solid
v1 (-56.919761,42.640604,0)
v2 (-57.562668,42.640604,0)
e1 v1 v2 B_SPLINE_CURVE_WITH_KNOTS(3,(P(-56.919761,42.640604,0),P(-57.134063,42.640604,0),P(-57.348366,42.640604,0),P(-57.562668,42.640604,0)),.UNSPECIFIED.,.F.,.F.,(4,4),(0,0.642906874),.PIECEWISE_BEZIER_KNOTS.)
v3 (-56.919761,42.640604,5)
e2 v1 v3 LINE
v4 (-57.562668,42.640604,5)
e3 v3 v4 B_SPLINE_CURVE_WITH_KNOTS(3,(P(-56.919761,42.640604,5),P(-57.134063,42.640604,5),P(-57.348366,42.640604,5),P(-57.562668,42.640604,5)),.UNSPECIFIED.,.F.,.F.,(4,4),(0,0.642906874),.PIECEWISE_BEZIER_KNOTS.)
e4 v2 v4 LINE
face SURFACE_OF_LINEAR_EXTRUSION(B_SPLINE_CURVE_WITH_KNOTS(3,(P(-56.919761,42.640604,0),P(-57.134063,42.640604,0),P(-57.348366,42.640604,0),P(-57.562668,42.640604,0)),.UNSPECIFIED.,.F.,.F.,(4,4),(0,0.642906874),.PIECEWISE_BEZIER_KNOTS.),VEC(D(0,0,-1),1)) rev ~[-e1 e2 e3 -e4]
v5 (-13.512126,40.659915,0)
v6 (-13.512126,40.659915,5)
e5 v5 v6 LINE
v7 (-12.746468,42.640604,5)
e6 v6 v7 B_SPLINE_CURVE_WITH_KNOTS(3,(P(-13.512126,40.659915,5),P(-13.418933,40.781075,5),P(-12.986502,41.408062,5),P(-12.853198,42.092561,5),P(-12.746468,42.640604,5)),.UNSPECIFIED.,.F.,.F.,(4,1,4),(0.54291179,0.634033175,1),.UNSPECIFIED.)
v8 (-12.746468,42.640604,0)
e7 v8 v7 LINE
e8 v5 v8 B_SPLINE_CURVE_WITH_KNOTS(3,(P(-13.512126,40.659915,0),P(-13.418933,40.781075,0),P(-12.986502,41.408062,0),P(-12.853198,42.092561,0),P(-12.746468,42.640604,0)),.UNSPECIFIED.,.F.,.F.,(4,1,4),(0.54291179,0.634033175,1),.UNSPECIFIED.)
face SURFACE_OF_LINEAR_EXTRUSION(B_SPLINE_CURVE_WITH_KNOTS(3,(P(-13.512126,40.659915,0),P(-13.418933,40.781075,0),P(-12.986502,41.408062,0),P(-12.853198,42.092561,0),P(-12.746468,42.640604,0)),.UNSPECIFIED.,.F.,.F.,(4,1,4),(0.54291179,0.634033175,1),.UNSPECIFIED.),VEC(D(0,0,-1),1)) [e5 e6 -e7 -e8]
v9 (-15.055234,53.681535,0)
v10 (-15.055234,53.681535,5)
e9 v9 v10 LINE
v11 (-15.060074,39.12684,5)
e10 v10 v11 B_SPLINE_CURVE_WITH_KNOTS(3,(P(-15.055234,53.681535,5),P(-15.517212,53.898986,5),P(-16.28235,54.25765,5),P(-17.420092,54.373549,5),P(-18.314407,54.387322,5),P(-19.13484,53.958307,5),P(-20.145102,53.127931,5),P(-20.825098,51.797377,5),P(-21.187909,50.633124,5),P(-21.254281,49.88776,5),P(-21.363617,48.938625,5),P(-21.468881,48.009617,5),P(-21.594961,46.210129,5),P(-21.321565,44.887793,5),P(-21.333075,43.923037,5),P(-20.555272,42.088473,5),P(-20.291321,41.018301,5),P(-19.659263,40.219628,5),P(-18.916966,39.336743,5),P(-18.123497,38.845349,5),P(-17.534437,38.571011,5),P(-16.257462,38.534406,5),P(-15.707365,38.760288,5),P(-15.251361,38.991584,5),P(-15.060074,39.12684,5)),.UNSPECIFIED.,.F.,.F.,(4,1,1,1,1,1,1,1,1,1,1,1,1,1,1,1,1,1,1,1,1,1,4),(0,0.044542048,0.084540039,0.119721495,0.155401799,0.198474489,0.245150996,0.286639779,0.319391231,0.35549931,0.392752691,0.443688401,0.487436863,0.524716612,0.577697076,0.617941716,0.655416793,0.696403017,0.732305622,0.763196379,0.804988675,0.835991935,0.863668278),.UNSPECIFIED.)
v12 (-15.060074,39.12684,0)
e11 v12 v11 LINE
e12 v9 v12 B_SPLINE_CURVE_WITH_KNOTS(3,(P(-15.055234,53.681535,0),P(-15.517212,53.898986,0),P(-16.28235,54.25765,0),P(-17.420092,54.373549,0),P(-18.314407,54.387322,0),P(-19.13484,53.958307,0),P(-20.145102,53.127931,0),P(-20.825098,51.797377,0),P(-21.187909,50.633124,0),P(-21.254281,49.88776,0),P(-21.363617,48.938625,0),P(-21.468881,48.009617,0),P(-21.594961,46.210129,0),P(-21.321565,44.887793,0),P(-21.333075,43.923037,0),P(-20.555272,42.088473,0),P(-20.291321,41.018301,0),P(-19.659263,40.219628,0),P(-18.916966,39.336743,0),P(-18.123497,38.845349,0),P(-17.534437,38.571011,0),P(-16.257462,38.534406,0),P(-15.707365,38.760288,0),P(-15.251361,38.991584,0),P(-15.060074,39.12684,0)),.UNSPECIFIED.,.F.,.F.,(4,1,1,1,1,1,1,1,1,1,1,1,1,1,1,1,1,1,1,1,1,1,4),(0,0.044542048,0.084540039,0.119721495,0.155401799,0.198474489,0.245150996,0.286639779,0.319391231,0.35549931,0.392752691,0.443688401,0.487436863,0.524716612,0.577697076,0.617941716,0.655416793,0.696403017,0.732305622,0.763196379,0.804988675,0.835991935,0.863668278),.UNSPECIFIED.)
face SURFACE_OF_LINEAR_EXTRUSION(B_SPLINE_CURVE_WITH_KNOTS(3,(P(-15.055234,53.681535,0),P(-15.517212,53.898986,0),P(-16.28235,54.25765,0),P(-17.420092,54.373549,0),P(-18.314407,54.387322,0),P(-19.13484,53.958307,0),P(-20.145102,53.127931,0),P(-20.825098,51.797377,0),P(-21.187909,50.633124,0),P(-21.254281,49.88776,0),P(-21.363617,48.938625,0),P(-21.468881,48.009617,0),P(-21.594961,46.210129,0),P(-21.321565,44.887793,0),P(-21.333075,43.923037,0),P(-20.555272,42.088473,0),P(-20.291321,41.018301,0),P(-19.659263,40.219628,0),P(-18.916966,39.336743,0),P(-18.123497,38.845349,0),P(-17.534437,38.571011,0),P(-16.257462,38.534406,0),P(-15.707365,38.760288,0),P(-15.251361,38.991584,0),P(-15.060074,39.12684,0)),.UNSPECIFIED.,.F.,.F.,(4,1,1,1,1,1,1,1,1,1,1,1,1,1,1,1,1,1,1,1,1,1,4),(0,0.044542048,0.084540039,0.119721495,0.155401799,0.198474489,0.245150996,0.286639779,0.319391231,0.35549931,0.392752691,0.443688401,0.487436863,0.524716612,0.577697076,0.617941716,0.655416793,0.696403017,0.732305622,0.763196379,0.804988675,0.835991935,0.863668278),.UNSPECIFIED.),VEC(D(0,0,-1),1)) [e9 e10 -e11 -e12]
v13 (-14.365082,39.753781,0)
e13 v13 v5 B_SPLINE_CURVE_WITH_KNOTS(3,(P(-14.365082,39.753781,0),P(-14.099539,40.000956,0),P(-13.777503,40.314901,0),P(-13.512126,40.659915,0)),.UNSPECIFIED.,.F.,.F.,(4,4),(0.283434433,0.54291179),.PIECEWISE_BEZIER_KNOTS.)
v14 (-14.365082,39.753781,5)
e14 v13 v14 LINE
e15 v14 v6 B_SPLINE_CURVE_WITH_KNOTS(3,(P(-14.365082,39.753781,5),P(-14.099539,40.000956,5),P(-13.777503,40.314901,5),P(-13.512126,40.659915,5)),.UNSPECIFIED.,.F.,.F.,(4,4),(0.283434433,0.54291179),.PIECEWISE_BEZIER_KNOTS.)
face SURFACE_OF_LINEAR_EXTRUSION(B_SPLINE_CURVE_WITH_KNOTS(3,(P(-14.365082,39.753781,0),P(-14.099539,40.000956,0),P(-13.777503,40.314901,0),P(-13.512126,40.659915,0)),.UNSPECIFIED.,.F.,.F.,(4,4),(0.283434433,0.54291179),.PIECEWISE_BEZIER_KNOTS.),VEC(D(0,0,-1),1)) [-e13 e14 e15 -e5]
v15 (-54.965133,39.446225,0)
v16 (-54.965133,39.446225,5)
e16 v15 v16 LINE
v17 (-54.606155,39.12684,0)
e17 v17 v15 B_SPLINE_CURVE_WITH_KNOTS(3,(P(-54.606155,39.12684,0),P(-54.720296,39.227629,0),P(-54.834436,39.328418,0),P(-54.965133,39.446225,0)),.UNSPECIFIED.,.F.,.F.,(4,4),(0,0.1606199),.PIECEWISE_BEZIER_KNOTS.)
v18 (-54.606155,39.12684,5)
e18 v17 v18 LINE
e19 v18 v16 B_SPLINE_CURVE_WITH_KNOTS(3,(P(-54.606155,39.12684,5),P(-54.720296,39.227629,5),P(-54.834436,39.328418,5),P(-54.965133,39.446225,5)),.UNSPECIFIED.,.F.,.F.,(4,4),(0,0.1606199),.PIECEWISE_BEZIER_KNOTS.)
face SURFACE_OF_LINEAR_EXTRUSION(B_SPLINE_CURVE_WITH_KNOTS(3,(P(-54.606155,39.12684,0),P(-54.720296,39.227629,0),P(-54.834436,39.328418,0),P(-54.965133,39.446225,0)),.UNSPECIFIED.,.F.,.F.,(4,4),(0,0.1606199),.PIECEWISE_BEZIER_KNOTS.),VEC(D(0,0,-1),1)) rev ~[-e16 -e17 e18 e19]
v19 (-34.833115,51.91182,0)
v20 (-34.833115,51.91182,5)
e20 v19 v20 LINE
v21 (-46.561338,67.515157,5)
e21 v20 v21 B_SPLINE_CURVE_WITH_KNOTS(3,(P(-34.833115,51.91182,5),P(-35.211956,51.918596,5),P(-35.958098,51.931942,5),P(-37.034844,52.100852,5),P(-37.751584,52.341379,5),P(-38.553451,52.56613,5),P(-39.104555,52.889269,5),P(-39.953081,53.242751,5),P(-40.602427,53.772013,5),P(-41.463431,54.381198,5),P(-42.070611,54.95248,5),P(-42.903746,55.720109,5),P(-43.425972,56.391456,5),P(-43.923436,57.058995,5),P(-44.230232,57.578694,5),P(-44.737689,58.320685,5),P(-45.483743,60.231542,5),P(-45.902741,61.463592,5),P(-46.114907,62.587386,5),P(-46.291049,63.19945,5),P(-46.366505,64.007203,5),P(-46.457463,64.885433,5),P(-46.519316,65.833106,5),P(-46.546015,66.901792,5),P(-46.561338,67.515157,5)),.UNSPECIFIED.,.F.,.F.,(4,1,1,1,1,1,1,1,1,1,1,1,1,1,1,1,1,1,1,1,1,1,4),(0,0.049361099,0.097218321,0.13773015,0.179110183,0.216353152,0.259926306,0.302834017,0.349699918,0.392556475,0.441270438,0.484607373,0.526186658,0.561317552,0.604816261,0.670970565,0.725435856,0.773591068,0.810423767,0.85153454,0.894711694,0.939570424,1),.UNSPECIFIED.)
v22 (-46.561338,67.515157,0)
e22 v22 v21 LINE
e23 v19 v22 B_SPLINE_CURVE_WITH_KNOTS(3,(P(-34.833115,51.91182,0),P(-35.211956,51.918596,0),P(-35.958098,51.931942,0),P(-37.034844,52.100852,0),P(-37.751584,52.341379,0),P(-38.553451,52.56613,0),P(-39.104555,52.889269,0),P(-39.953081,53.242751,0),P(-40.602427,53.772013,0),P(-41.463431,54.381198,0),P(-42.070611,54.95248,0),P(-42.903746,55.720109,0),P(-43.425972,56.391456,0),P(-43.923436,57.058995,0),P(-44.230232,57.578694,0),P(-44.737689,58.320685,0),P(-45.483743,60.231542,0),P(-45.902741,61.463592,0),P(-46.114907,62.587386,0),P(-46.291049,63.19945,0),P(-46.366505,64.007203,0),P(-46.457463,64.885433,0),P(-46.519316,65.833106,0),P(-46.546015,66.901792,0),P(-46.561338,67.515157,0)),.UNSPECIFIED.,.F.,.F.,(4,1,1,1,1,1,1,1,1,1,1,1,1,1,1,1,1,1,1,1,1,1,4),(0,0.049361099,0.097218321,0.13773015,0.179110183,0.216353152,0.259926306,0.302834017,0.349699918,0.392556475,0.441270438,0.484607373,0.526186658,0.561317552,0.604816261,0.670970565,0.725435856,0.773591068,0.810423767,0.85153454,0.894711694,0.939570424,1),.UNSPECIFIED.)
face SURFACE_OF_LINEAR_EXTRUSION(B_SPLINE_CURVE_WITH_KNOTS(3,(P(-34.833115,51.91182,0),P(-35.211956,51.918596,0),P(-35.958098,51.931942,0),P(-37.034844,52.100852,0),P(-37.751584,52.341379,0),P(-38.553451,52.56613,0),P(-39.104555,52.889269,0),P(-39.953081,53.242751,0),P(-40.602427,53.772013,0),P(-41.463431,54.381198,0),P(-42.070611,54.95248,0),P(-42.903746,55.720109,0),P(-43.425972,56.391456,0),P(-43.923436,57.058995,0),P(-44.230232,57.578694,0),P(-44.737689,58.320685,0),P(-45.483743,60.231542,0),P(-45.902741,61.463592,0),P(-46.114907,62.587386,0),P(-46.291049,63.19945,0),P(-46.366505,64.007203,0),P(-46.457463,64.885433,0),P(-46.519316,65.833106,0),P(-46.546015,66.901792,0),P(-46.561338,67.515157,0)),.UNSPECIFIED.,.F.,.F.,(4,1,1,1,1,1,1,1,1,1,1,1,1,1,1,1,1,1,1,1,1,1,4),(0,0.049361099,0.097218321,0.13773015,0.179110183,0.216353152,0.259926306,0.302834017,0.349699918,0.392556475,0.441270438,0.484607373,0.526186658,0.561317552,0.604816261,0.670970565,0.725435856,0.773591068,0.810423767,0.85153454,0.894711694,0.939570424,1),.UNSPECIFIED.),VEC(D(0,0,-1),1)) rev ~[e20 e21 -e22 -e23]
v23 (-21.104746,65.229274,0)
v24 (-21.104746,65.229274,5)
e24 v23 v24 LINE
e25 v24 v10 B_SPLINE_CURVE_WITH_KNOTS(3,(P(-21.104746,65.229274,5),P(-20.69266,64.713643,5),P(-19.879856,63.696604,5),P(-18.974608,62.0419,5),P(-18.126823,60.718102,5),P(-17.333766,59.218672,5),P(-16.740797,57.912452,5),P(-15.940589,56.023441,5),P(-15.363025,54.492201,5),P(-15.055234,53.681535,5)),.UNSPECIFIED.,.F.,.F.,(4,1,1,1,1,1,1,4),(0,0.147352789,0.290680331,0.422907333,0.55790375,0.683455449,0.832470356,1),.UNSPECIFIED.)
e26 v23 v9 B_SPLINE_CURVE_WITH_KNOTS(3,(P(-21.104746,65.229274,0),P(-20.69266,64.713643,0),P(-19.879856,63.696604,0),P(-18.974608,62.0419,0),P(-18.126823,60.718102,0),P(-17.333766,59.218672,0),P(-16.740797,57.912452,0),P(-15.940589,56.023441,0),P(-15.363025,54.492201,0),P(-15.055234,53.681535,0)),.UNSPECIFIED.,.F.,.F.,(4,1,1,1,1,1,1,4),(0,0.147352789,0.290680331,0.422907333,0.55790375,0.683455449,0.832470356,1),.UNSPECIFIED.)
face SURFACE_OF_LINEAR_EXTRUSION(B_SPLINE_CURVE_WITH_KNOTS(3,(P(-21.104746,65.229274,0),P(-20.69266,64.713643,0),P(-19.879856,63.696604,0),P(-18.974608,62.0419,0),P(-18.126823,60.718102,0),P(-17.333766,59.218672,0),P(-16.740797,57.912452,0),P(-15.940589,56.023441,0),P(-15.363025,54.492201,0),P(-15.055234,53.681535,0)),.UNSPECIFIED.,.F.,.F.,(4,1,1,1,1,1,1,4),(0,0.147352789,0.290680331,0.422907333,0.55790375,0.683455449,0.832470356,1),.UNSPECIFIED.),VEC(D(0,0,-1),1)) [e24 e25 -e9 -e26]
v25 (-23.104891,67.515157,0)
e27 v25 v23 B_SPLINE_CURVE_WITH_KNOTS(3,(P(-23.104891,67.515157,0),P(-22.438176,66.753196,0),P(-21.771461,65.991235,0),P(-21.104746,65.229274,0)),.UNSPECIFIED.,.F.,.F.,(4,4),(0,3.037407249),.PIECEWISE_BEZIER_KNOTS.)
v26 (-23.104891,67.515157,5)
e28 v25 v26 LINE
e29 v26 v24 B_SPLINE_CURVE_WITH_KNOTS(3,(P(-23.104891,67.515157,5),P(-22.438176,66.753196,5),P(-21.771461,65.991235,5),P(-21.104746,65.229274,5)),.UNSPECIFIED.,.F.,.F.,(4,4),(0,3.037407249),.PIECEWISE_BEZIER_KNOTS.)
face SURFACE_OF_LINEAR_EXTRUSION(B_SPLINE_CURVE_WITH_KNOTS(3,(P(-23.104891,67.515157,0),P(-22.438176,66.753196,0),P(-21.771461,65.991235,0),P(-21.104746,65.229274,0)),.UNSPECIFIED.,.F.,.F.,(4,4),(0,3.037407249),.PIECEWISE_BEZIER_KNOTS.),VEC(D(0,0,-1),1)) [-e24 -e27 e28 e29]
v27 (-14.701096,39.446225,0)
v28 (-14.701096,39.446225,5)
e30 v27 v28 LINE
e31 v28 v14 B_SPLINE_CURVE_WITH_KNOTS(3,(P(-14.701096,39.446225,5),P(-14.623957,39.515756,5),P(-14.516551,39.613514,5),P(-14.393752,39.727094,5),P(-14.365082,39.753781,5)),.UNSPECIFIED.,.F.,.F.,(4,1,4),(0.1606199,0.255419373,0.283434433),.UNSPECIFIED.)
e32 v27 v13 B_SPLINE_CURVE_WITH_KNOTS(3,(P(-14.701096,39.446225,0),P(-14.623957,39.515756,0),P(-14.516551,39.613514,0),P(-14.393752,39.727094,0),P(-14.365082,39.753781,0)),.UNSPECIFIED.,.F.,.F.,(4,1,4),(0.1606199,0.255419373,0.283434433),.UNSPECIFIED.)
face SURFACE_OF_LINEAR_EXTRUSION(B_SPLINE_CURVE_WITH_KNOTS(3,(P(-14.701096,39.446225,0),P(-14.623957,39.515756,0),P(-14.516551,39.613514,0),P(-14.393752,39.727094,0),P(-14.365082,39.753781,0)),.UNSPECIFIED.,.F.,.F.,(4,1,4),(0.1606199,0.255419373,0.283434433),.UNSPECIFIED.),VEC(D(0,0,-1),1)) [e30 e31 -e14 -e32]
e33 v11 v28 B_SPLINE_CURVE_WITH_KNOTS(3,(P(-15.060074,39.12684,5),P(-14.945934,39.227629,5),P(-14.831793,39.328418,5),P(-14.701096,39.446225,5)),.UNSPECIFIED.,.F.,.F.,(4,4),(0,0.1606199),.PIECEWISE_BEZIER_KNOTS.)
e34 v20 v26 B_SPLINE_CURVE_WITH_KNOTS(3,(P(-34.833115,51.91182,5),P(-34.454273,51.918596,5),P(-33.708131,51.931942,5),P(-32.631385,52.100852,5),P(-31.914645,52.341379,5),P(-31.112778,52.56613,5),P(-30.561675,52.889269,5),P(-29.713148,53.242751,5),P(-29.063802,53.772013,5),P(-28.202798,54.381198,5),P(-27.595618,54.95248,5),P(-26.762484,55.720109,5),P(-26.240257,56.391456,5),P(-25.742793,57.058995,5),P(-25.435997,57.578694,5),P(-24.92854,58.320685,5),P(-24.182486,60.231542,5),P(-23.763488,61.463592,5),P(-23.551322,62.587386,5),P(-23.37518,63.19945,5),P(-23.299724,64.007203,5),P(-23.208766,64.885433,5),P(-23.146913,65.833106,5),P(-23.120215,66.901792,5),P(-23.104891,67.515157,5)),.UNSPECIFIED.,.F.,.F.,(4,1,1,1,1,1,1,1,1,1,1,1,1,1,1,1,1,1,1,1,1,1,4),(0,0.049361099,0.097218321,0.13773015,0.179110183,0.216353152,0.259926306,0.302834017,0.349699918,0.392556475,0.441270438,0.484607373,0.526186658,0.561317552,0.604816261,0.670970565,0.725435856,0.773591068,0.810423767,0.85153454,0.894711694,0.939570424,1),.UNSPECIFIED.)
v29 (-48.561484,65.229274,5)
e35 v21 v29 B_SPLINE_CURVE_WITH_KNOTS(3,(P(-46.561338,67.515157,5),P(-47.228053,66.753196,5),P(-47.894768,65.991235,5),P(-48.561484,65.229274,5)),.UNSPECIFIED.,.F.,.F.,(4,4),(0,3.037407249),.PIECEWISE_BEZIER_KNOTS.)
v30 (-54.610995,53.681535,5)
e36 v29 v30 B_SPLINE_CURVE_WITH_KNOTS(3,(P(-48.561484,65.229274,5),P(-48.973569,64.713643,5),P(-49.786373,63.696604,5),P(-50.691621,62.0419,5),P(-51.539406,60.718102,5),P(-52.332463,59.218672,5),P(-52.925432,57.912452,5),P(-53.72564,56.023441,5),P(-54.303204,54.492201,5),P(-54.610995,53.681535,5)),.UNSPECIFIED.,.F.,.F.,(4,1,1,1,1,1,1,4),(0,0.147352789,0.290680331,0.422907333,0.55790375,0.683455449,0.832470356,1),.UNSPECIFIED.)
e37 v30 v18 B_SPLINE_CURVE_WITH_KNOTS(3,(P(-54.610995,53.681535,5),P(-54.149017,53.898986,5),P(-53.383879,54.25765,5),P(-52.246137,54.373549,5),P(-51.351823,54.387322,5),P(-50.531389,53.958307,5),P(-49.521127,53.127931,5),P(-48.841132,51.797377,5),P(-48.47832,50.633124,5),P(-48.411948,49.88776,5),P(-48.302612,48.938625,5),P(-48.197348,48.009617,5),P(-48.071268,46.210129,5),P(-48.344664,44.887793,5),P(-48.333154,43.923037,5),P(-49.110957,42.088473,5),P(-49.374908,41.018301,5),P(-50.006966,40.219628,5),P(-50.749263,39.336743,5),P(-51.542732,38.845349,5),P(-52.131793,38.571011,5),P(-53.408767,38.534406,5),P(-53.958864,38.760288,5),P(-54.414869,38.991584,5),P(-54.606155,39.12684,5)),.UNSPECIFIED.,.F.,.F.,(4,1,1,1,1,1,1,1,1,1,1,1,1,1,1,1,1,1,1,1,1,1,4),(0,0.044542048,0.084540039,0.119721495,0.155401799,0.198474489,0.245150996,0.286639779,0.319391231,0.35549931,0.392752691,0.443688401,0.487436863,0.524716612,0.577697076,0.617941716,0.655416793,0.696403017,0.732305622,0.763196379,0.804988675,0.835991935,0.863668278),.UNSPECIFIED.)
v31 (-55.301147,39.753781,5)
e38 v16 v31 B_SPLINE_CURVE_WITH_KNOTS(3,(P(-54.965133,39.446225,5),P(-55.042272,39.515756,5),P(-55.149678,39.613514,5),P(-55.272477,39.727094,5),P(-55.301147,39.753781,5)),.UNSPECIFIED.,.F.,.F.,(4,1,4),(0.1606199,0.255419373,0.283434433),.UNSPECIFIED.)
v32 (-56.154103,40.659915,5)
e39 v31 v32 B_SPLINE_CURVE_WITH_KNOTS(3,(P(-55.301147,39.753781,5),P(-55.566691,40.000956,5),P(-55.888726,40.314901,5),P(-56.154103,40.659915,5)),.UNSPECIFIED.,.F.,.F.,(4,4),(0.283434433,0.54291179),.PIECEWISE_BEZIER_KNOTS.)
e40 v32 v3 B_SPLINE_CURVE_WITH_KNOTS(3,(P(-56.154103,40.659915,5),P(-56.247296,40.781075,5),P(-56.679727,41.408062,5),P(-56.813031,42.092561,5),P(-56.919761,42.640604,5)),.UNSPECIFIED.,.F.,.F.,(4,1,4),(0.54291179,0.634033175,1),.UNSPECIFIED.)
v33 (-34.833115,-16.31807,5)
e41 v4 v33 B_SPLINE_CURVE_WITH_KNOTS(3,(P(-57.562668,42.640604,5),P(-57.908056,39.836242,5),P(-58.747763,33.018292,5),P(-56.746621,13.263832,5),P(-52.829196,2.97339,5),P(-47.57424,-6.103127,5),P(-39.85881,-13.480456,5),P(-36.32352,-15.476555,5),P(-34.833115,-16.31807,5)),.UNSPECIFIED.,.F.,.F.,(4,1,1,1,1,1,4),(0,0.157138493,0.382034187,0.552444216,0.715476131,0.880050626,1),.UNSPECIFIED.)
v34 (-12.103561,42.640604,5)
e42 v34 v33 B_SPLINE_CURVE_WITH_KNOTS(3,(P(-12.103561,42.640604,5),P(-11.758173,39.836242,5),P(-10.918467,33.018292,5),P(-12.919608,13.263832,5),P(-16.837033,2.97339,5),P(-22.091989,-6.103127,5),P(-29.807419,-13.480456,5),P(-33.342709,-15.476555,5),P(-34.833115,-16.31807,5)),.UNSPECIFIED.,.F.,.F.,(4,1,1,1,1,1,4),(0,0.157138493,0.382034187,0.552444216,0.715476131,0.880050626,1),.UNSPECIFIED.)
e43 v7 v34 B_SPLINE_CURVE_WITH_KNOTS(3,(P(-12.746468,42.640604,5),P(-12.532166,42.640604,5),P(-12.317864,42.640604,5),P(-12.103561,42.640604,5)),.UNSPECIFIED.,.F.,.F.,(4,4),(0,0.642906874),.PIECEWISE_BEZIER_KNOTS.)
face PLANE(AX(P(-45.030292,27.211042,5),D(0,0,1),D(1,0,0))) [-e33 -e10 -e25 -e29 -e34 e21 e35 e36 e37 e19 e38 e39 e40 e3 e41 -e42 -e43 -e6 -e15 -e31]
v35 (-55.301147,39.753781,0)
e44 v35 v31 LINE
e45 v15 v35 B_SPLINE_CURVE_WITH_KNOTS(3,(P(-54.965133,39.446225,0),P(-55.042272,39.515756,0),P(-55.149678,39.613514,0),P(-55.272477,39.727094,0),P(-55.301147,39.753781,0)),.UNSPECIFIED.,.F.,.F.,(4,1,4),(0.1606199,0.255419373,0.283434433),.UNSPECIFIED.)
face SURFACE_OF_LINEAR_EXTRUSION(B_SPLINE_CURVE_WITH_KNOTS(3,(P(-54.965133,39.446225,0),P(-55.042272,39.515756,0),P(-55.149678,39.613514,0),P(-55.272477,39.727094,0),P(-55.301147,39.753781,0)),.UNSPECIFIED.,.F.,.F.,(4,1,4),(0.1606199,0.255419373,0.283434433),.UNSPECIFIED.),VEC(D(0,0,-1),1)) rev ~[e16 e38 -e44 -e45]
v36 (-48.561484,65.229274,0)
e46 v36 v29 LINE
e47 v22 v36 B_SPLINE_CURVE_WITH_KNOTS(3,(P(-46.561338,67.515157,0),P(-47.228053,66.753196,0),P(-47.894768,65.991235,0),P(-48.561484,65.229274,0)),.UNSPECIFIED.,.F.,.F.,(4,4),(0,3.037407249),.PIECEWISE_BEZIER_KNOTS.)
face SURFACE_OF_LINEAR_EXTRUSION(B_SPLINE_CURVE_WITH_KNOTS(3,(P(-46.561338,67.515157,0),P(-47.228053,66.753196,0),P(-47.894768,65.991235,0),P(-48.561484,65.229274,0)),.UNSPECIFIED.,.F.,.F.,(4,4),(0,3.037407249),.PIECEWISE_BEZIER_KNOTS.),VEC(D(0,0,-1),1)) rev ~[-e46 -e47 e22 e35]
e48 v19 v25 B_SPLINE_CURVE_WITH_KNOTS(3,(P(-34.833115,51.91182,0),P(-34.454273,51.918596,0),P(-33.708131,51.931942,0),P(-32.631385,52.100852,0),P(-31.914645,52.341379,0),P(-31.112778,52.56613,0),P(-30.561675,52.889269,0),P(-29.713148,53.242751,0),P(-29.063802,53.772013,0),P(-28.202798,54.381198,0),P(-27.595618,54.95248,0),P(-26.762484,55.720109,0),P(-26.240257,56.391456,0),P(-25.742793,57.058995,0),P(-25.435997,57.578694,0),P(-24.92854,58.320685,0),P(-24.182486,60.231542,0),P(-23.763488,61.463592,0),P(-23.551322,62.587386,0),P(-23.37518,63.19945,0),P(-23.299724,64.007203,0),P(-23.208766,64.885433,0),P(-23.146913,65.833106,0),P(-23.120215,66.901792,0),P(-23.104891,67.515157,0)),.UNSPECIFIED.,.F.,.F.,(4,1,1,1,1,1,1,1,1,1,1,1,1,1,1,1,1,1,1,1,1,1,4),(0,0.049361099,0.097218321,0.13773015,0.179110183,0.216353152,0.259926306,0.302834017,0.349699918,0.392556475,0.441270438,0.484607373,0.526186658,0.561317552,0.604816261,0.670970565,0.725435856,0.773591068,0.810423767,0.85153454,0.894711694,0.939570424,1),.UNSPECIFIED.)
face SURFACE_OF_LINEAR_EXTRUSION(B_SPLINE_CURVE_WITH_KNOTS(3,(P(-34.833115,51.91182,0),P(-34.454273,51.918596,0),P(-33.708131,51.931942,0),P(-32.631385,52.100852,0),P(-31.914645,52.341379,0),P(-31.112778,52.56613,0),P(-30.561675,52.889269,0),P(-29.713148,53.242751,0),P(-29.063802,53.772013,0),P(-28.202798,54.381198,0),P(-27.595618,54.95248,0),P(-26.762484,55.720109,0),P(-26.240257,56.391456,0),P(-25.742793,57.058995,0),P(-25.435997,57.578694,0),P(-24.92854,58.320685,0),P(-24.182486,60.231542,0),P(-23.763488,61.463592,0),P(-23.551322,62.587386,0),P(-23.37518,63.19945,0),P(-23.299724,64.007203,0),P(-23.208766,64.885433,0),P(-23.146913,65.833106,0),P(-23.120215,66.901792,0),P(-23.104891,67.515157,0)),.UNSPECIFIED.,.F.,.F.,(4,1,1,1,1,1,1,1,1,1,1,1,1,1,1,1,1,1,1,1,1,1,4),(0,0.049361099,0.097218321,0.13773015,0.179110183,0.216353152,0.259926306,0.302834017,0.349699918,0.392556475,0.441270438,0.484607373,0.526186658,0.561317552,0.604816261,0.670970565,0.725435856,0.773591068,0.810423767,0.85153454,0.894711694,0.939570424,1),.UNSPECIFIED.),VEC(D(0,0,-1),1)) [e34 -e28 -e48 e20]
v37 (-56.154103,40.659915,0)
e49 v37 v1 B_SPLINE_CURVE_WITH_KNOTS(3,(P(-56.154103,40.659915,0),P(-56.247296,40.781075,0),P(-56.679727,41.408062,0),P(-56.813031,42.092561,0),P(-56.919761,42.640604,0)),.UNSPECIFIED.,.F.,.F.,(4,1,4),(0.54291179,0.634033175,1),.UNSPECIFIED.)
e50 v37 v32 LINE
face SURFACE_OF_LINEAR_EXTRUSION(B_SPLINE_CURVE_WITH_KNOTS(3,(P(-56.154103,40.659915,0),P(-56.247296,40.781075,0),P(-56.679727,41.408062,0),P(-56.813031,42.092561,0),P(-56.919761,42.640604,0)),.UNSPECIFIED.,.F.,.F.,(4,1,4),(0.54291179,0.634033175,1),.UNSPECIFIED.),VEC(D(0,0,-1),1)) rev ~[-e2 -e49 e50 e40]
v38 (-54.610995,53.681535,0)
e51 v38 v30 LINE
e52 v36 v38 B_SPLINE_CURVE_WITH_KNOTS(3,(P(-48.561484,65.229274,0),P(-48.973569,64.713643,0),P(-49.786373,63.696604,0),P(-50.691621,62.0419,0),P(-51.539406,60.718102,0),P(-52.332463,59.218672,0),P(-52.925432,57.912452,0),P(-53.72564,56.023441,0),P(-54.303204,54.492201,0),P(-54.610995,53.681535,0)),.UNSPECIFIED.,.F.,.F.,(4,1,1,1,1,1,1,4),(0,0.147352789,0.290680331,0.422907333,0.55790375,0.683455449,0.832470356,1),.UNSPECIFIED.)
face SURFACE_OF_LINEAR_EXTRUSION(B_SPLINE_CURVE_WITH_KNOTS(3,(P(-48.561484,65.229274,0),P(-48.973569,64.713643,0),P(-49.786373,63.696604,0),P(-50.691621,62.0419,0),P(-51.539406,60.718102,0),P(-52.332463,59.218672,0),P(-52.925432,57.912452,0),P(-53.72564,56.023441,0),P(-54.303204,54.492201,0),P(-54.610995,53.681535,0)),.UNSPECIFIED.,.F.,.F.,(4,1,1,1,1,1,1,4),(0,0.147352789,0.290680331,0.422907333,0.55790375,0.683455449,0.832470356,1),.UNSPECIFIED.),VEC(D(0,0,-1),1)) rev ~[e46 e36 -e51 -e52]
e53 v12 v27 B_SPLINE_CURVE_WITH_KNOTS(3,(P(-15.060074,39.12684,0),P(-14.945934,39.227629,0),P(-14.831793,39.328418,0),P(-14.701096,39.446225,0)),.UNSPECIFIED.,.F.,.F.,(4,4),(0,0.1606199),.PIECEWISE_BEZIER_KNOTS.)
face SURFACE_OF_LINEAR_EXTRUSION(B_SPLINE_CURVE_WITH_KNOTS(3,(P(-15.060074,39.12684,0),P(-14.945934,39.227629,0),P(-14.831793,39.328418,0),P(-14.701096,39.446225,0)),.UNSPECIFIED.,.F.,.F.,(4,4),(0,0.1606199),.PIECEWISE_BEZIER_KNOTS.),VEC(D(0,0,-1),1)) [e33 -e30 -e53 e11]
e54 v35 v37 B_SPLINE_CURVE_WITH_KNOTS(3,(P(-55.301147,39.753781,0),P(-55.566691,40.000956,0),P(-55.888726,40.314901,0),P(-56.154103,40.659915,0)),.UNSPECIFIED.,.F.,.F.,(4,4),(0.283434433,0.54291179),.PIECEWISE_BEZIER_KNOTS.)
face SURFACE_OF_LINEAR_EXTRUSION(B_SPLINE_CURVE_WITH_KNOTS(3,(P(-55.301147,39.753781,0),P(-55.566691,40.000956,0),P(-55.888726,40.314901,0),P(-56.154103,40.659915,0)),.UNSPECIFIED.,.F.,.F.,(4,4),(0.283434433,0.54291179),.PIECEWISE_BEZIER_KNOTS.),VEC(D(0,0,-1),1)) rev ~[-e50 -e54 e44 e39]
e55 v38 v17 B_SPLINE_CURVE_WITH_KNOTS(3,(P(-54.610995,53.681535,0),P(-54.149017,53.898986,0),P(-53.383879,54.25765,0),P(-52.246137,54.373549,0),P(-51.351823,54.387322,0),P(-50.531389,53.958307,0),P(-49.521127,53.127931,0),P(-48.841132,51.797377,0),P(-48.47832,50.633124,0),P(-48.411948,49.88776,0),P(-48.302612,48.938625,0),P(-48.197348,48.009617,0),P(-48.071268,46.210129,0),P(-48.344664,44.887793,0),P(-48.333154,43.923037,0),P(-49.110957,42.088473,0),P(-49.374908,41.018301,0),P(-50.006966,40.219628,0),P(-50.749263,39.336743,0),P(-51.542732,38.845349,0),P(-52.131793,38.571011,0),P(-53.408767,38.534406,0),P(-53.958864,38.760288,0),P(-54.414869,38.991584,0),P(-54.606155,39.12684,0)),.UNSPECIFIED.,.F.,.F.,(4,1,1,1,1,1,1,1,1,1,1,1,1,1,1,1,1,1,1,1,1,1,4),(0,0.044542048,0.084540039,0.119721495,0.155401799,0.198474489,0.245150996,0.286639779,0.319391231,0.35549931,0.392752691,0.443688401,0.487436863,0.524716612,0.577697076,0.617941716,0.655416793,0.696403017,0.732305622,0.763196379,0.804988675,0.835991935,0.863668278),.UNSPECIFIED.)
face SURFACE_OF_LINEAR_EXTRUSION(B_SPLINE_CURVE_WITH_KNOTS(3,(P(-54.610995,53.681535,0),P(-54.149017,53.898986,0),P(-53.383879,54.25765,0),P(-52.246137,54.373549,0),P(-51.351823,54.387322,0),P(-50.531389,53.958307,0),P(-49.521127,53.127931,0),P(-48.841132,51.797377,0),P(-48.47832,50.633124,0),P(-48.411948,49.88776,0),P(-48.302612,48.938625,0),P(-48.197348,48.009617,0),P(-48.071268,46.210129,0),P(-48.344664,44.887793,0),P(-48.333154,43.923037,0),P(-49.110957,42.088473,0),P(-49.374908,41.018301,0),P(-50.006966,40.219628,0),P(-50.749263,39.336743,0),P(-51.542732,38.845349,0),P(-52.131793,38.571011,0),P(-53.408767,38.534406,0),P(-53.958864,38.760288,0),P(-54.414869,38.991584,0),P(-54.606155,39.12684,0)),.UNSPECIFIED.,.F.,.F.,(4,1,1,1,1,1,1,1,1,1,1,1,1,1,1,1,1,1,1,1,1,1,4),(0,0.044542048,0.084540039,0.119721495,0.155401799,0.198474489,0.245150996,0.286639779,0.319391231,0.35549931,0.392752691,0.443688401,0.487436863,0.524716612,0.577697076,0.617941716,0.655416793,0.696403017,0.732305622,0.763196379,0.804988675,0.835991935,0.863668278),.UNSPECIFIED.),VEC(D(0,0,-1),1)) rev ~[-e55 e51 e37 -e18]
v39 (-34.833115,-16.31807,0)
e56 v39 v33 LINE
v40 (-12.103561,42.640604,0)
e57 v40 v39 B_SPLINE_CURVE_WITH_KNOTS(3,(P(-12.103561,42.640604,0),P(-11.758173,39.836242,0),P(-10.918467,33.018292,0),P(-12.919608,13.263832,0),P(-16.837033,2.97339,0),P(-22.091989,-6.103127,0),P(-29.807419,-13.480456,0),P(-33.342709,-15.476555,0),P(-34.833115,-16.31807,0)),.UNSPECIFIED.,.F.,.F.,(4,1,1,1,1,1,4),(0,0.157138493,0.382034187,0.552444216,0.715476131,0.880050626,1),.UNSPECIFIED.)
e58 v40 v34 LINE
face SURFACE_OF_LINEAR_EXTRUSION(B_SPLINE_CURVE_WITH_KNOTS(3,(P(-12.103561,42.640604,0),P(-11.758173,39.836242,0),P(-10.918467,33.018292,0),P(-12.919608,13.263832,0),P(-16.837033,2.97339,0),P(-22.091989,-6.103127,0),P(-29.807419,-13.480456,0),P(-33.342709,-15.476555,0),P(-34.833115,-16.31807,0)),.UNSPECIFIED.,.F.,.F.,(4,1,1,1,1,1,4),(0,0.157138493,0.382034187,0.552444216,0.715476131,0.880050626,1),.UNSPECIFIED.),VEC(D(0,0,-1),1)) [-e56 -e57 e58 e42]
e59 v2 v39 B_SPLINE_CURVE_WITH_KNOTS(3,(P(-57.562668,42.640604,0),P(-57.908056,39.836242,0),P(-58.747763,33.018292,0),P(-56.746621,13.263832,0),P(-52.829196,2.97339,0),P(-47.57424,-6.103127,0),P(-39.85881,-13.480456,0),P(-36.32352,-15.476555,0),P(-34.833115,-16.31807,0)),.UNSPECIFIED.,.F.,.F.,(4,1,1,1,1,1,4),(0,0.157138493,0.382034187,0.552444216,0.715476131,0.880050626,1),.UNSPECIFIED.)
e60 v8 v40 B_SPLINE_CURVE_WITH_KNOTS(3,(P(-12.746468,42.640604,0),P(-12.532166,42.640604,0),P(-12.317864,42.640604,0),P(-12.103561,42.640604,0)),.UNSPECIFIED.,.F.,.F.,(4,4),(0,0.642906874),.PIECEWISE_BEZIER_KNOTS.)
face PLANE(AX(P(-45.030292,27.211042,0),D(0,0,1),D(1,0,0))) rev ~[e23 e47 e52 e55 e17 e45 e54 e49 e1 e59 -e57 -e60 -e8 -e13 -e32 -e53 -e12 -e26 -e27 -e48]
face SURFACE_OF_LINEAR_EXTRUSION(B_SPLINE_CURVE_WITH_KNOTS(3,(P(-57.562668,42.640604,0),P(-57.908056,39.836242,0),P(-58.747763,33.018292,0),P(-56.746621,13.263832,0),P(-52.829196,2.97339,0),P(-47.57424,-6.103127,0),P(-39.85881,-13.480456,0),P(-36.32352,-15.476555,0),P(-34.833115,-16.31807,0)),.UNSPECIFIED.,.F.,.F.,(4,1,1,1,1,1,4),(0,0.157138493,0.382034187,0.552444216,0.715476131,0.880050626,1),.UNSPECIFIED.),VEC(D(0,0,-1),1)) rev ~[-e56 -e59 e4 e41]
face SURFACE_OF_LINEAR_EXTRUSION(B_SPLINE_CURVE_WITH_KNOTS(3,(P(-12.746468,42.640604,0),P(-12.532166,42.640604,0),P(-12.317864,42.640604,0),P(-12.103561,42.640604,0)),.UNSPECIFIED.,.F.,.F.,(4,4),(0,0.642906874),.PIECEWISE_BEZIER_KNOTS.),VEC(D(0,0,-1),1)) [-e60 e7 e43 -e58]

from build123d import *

# Parameters (mm, degrees)
F1_DEPTH = 5


with BuildPart() as f1:
    # F0 (on Top) → F1 (new body)
    with BuildSketch(Plane.XY):
        with BuildLine():
            add(Edge.make_bspline(
                [(-57.5626678765, 42.6406040788), (-57.9080562921, 39.8362415044), (-58.7477625906, 33.018291596), (-56.7466207027, 13.2638324141), (-52.8291963564, 2.9733901681), (-47.5742402511, -6.1031265313), (-39.8588097864, -13.4804555699), (-36.3235197152, -15.4765553984), (-34.8331145942, -16.3180697709)],
                knots=[0, 0, 0, 0, 0.1571384934, 0.3820341872, 0.5524442159, 0.7154761313, 0.880050626, 1, 1, 1, 1], degree=3))
            Line((-34.8331145942, -16.3180697709), (-34.8331145942, 51.9118197262))
            add(Edge.make_bspline(
                [(-34.8331145942, 51.9118197262), (-35.2119563545, 51.9185959347), (-35.9580977588, 51.9319419017), (-37.0348440475, 52.1008517041), (-37.751583743, 52.3413787982), (-38.5534512152, 52.5661302145), (-39.1045545857, 52.8892692232), (-39.9530807974, 53.242750596), (-40.6024267483, 53.772012849), (-41.4634310205, 54.3811984195), (-42.0706109603, 54.9524802776), (-42.9037456065, 55.720108633), (-43.4259718244, 56.3914555617), (-43.9234358745, 57.0589950526), (-44.2302322209, 57.5786939094), (-44.7376887484, 58.3206849113), (-45.4837434911, 60.2315423487), (-45.9027412703, 61.4635918917), (-46.1149072684, 62.587386495), (-46.2910492058, 63.1994502703), (-46.3665046988, 64.0072029965), (-46.457462946, 64.8854328545), (-46.519316114, 65.8331058884), (-46.5460145844, 66.9017915796), (-46.5613380075, 67.5151571631)],
                knots=[0, 0, 0, 0, 0.0493610993, 0.0972183213, 0.1377301504, 0.1791101827, 0.2163531524, 0.2599263059, 0.3028340171, 0.3496999184, 0.3925564746, 0.4412704382, 0.4846073731, 0.5261866583, 0.5613175523, 0.6048162611, 0.6709705647, 0.7254358561, 0.7735910677, 0.8104237672, 0.8515345399, 0.8947116941, 0.939570424, 1, 1, 1, 1], degree=3))
            add(Edge.make_bspline(
                [(-46.5613380075, 67.5151571631), (-47.2280532122, 66.7531962196), (-47.8947684169, 65.9912352761), (-48.5614836216, 65.2292743325)],
                knots=[0, 0, 0, 0, 3.0374072485, 3.0374072485, 3.0374072485, 3.0374072485], degree=3))
            add(Edge.make_bspline(
                [(-48.5614836216, 65.2292743325), (-48.9735694738, 64.7136433972), (-49.7863729956, 63.6966043776), (-50.6916211477, 62.0419000493), (-51.5394060192, 60.7181023455), (-52.3324629663, 59.2186716244), (-52.9254322483, 57.9124520433), (-53.7256402788, 56.0234412783), (-54.3032039704, 54.4922006053), (-54.6109952031, 53.6815354107)],
                knots=[0, 0, 0, 0, 0.1473527895, 0.2906803309, 0.4229073329, 0.5579037502, 0.6834554494, 0.8324703555, 1, 1, 1, 1], degree=3))
            add(Edge.make_bspline(
                [(-54.6109952031, 53.6815354107), (-54.1490167087, 53.8989858417), (-53.3838791321, 54.2576504993), (-52.2461372119, 54.37354881), (-51.3518225299, 54.3873217778), (-50.5313887829, 53.9583071647), (-49.5211267731, 53.1279307693), (-48.8411316868, 51.797376606), (-48.4783197566, 50.6331243975), (-48.4119479233, 49.8877598597), (-48.3026124514, 48.9386253318), (-48.1973480176, 48.009616531), (-48.071268063, 46.2101292746), (-48.3446637999, 44.8877932345), (-48.333153973, 43.9230372084), (-49.1109571235, 42.0884729348), (-49.3749084991, 41.0183008159), (-50.0069662335, 40.2196283926), (-50.7492629002, 39.336743191), (-51.5427317075, 38.8453486879), (-52.1317926314, 38.5710112066), (-53.4087673752, 38.5344057135), (-53.9588643746, 38.7602882902), (-54.4148685339, 38.9915837878), (-54.6061547794, 39.1268395676)],
                knots=[0, 0, 0, 0, 0.0445420475, 0.0845400391, 0.1197214949, 0.1554017993, 0.1984744889, 0.2451509962, 0.2866397794, 0.3193912307, 0.3554993097, 0.3927526907, 0.4436884008, 0.4874368635, 0.5247166115, 0.5776970761, 0.6179417164, 0.6554167928, 0.6964030165, 0.732305622, 0.7631963792, 0.8049886746, 0.8359919351, 0.8636682784, 0.8636682784, 0.8636682784, 0.8636682784], degree=3))
            add(Edge.make_bspline(
                [(-54.6061547794, 39.1268395676), (-54.6592591816, 39.1643889341), (-54.7889448477, 39.2644677015), (-54.8995408977, 39.3780040162), (-54.9651332554, 39.4462250728)],
                knots=[0.8636682784, 0.8636682784, 0.8636682784, 0.8636682784, 0.8713517146, 0.8831028995, 0.8831028995, 0.8831028995, 0.8831028995], degree=3))
            add(Edge.make_bspline(
                [(-54.9651332554, 39.4462250728), (-55.0422718783, 39.5157558174), (-55.1496780772, 39.6135140467), (-55.2724769461, 39.7270938328), (-55.3011469605, 39.7537806896)],
                knots=[0.1606199003, 0.1606199003, 0.1606199003, 0.1606199003, 0.2554193728, 0.2834344333, 0.2834344333, 0.2834344333, 0.2834344333], degree=3))
            add(Edge.make_bspline(
                [(-55.3011469605, 39.7537806896), (-55.3239737809, 39.7694364315), (-55.5998529876, 39.9433833713), (-56.0474560794, 39.9919072855), (-56.1453497064, 40.5782185414), (-56.1541033084, 40.6599148874)],
                knots=[0.9022974714, 0.9022974714, 0.9022974714, 0.9022974714, 0.905798506, 0.9433289244, 0.9488544637, 0.9488544637, 0.9488544637, 0.9488544637], degree=3))
            add(Edge.make_bspline(
                [(-56.1541033084, 40.6599148874), (-56.2472964392, 40.7810745041), (-56.6797268519, 41.4080624482), (-56.8130311576, 42.0925613255), (-56.9197610021, 42.6406040788)],
                knots=[0.5429117903, 0.5429117903, 0.5429117903, 0.5429117903, 0.6340331748, 1, 1, 1, 1], degree=3))
            add(Edge.make_bspline(
                [(-56.9197610021, 42.6406040788), (-57.1340632935, 42.6406040788), (-57.348365585, 42.6406040788), (-57.5626678765, 42.6406040788)],
                knots=[0, 0, 0, 0, 0.6429068744, 0.6429068744, 0.6429068744, 0.6429068744], degree=3))
        make_face()
        with BuildLine():
            Line((-34.8331145942, 51.9118197262), (-34.8331145942, -16.3180697709))
            add(Edge.make_bspline(
                [(-12.103561312, 42.6406040788), (-11.7581728963, 39.8362415044), (-10.9184665978, 33.018291596), (-12.9196084857, 13.2638324141), (-16.8370328321, 2.9733901681), (-22.0919889373, -6.1031265313), (-29.8074194021, -13.4804555699), (-33.3427094733, -15.4765553984), (-34.8331145942, -16.3180697709)],
                knots=[0, 0, 0, 0, 0.1571384934, 0.3820341872, 0.5524442159, 0.7154761313, 0.880050626, 1, 1, 1, 1], degree=3))
            add(Edge.make_bspline(
                [(-12.7464681864, 42.6406040788), (-12.5321658949, 42.6406040788), (-12.3178636034, 42.6406040788), (-12.103561312, 42.6406040788)],
                knots=[0, 0, 0, 0, 0.6429068744, 0.6429068744, 0.6429068744, 0.6429068744], degree=3))
            add(Edge.make_bspline(
                [(-13.51212588, 40.6599148874), (-13.4189327492, 40.7810745041), (-12.9865023366, 41.4080624482), (-12.8531980309, 42.0925613255), (-12.7464681864, 42.6406040788)],
                knots=[0.5429117903, 0.5429117903, 0.5429117903, 0.5429117903, 0.6340331748, 1, 1, 1, 1], degree=3))
            add(Edge.make_bspline(
                [(-14.3650822279, 39.7537806896), (-14.3422554076, 39.7694364315), (-14.0663762008, 39.9433833713), (-13.618773109, 39.9919072855), (-13.5208794821, 40.5782185414), (-13.51212588, 40.6599148874)],
                knots=[0.9022974714, 0.9022974714, 0.9022974714, 0.9022974714, 0.905798506, 0.9433289244, 0.9488544637, 0.9488544637, 0.9488544637, 0.9488544637], degree=3))
            add(Edge.make_bspline(
                [(-14.7010959331, 39.4462250728), (-14.6239573101, 39.5157558174), (-14.5165511113, 39.6135140467), (-14.3937522423, 39.7270938328), (-14.3650822279, 39.7537806896)],
                knots=[0.1606199003, 0.1606199003, 0.1606199003, 0.1606199003, 0.2554193728, 0.2834344333, 0.2834344333, 0.2834344333, 0.2834344333], degree=3))
            add(Edge.make_bspline(
                [(-15.0600744091, 39.1268395676), (-15.0069700068, 39.1643889341), (-14.8772843408, 39.2644677015), (-14.7666882907, 39.3780040162), (-14.7010959331, 39.4462250728)],
                knots=[0.8636682784, 0.8636682784, 0.8636682784, 0.8636682784, 0.8713517146, 0.8831028995, 0.8831028995, 0.8831028995, 0.8831028995], degree=3))
            add(Edge.make_bspline(
                [(-15.0552339853, 53.6815354107), (-15.5172124798, 53.8989858417), (-16.2823500564, 54.2576504993), (-17.4200919766, 54.37354881), (-18.3144066585, 54.3873217778), (-19.1348404055, 53.9583071647), (-20.1451024154, 53.1279307693), (-20.8250975017, 51.797376606), (-21.1879094318, 50.6331243975), (-21.2542812651, 49.8877598597), (-21.363616737, 48.9386253318), (-21.4688811708, 48.009616531), (-21.5949611255, 46.2101292746), (-21.3215653885, 44.8877932345), (-21.3330752154, 43.9230372084), (-20.555272065, 42.0884729348), (-20.2913206893, 41.0183008159), (-19.6592629549, 40.2196283926), (-18.9169662882, 39.336743191), (-18.123497481, 38.8453486879), (-17.5344365571, 38.5710112066), (-16.2574618133, 38.5344057135), (-15.7073648139, 38.7602882902), (-15.2513606546, 38.9915837878), (-15.0600744091, 39.1268395676)],
                knots=[0, 0, 0, 0, 0.0445420475, 0.0845400391, 0.1197214949, 0.1554017993, 0.1984744889, 0.2451509962, 0.2866397794, 0.3193912307, 0.3554993097, 0.3927526907, 0.4436884008, 0.4874368635, 0.5247166115, 0.5776970761, 0.6179417164, 0.6554167928, 0.6964030165, 0.732305622, 0.7631963792, 0.8049886746, 0.8359919351, 0.8636682784, 0.8636682784, 0.8636682784, 0.8636682784], degree=3))
            add(Edge.make_bspline(
                [(-21.1047455668, 65.2292743325), (-20.6926597146, 64.7136433972), (-19.8798561928, 63.6966043776), (-18.9746080407, 62.0419000493), (-18.1268231693, 60.7181023455), (-17.3337662222, 59.2186716244), (-16.7407969402, 57.9124520433), (-15.9405889096, 56.0234412783), (-15.363025218, 54.4922006053), (-15.0552339853, 53.6815354107)],
                knots=[0, 0, 0, 0, 0.1473527895, 0.2906803309, 0.4229073329, 0.5579037502, 0.6834554494, 0.8324703555, 1, 1, 1, 1], degree=3))
            add(Edge.make_bspline(
                [(-23.104891181, 67.5151571631), (-22.4381759763, 66.7531962196), (-21.7714607716, 65.9912352761), (-21.1047455668, 65.2292743325)],
                knots=[0, 0, 0, 0, 3.0374072485, 3.0374072485, 3.0374072485, 3.0374072485], degree=3))
            add(Edge.make_bspline(
                [(-34.8331145942, 51.9118197262), (-34.4542728339, 51.9185959347), (-33.7081314296, 51.9319419017), (-32.6313851409, 52.1008517041), (-31.9146454455, 52.3413787982), (-31.1127779733, 52.5661302145), (-30.5616746027, 52.8892692232), (-29.713148391, 53.242750596), (-29.0638024401, 53.772012849), (-28.202798168, 54.3811984195), (-27.5956182281, 54.9524802776), (-26.762483582, 55.720108633), (-26.240257364, 56.3914555617), (-25.7427933139, 57.0589950526), (-25.4359969675, 57.5786939094), (-24.92854044, 58.3206849113), (-24.1824856973, 60.2315423487), (-23.7634879182, 61.4635918917), (-23.55132192, 62.587386495), (-23.3751799827, 63.1994502703), (-23.2997244896, 64.0072029965), (-23.2087662424, 64.8854328545), (-23.1469130745, 65.8331058884), (-23.120214604, 66.9017915796), (-23.104891181, 67.5151571631)],
                knots=[0, 0, 0, 0, 0.0493610993, 0.0972183213, 0.1377301504, 0.1791101827, 0.2163531524, 0.2599263059, 0.3028340171, 0.3496999184, 0.3925564746, 0.4412704382, 0.4846073731, 0.5261866583, 0.5613175523, 0.6048162611, 0.6709705647, 0.7254358561, 0.7735910677, 0.8104237672, 0.8515345399, 0.8947116941, 0.939570424, 1, 1, 1, 1], degree=3))
        make_face()
        with BuildLine():
            add(Edge.make_bspline(
                [(-55.3011469605, 39.7537806896), (-55.566690544, 40.0009561348), (-55.8887264446, 40.3149006271), (-56.1541033084, 40.6599148874)],
                knots=[0.2834344333, 0.2834344333, 0.2834344333, 0.2834344333, 0.5429117903, 0.5429117903, 0.5429117903, 0.5429117903], degree=3))
            add(Edge.make_bspline(
                [(-55.3011469605, 39.7537806896), (-55.3239737809, 39.7694364315), (-55.5998529876, 39.9433833713), (-56.0474560794, 39.9919072855), (-56.1453497064, 40.5782185414), (-56.1541033084, 40.6599148874)],
                knots=[0.9022974714, 0.9022974714, 0.9022974714, 0.9022974714, 0.905798506, 0.9433289244, 0.9488544637, 0.9488544637, 0.9488544637, 0.9488544637], degree=3))
        make_face()
        with BuildLine():
            add(Edge.make_bspline(
                [(-14.3650822279, 39.7537806896), (-14.3422554076, 39.7694364315), (-14.0663762008, 39.9433833713), (-13.618773109, 39.9919072855), (-13.5208794821, 40.5782185414), (-13.51212588, 40.6599148874)],
                knots=[0.9022974714, 0.9022974714, 0.9022974714, 0.9022974714, 0.905798506, 0.9433289244, 0.9488544637, 0.9488544637, 0.9488544637, 0.9488544637], degree=3))
            add(Edge.make_bspline(
                [(-14.3650822279, 39.7537806896), (-14.0995386444, 40.0009561348), (-13.7775027438, 40.3149006271), (-13.51212588, 40.6599148874)],
                knots=[0.2834344333, 0.2834344333, 0.2834344333, 0.2834344333, 0.5429117903, 0.5429117903, 0.5429117903, 0.5429117903], degree=3))
        make_face()
        with BuildLine():
            add(Edge.make_bspline(
                [(-54.6061547794, 39.1268395676), (-54.6592591816, 39.1643889341), (-54.7889448477, 39.2644677015), (-54.8995408977, 39.3780040162), (-54.9651332554, 39.4462250728)],
                knots=[0.8636682784, 0.8636682784, 0.8636682784, 0.8636682784, 0.8713517146, 0.8831028995, 0.8831028995, 0.8831028995, 0.8831028995], degree=3))
            add(Edge.make_bspline(
                [(-54.6061547794, 39.1268395676), (-54.7202955635, 39.2276289267), (-54.8344363476, 39.3284182859), (-54.9651332554, 39.4462250728)],
                knots=[0, 0, 0, 0, 0.1606199003, 0.1606199003, 0.1606199003, 0.1606199003], degree=3))
        make_face()
        with BuildLine():
            add(Edge.make_bspline(
                [(-15.0600744091, 39.1268395676), (-14.945933625, 39.2276289267), (-14.8317928408, 39.3284182859), (-14.7010959331, 39.4462250728)],
                knots=[0, 0, 0, 0, 0.1606199003, 0.1606199003, 0.1606199003, 0.1606199003], degree=3))
            add(Edge.make_bspline(
                [(-15.0600744091, 39.1268395676), (-15.0069700068, 39.1643889341), (-14.8772843408, 39.2644677015), (-14.7666882907, 39.3780040162), (-14.7010959331, 39.4462250728)],
                knots=[0.8636682784, 0.8636682784, 0.8636682784, 0.8636682784, 0.8713517146, 0.8831028995, 0.8831028995, 0.8831028995, 0.8831028995], degree=3))
        make_face()
    extrude(amount=F1_DEPTH)


solid = f1.part
